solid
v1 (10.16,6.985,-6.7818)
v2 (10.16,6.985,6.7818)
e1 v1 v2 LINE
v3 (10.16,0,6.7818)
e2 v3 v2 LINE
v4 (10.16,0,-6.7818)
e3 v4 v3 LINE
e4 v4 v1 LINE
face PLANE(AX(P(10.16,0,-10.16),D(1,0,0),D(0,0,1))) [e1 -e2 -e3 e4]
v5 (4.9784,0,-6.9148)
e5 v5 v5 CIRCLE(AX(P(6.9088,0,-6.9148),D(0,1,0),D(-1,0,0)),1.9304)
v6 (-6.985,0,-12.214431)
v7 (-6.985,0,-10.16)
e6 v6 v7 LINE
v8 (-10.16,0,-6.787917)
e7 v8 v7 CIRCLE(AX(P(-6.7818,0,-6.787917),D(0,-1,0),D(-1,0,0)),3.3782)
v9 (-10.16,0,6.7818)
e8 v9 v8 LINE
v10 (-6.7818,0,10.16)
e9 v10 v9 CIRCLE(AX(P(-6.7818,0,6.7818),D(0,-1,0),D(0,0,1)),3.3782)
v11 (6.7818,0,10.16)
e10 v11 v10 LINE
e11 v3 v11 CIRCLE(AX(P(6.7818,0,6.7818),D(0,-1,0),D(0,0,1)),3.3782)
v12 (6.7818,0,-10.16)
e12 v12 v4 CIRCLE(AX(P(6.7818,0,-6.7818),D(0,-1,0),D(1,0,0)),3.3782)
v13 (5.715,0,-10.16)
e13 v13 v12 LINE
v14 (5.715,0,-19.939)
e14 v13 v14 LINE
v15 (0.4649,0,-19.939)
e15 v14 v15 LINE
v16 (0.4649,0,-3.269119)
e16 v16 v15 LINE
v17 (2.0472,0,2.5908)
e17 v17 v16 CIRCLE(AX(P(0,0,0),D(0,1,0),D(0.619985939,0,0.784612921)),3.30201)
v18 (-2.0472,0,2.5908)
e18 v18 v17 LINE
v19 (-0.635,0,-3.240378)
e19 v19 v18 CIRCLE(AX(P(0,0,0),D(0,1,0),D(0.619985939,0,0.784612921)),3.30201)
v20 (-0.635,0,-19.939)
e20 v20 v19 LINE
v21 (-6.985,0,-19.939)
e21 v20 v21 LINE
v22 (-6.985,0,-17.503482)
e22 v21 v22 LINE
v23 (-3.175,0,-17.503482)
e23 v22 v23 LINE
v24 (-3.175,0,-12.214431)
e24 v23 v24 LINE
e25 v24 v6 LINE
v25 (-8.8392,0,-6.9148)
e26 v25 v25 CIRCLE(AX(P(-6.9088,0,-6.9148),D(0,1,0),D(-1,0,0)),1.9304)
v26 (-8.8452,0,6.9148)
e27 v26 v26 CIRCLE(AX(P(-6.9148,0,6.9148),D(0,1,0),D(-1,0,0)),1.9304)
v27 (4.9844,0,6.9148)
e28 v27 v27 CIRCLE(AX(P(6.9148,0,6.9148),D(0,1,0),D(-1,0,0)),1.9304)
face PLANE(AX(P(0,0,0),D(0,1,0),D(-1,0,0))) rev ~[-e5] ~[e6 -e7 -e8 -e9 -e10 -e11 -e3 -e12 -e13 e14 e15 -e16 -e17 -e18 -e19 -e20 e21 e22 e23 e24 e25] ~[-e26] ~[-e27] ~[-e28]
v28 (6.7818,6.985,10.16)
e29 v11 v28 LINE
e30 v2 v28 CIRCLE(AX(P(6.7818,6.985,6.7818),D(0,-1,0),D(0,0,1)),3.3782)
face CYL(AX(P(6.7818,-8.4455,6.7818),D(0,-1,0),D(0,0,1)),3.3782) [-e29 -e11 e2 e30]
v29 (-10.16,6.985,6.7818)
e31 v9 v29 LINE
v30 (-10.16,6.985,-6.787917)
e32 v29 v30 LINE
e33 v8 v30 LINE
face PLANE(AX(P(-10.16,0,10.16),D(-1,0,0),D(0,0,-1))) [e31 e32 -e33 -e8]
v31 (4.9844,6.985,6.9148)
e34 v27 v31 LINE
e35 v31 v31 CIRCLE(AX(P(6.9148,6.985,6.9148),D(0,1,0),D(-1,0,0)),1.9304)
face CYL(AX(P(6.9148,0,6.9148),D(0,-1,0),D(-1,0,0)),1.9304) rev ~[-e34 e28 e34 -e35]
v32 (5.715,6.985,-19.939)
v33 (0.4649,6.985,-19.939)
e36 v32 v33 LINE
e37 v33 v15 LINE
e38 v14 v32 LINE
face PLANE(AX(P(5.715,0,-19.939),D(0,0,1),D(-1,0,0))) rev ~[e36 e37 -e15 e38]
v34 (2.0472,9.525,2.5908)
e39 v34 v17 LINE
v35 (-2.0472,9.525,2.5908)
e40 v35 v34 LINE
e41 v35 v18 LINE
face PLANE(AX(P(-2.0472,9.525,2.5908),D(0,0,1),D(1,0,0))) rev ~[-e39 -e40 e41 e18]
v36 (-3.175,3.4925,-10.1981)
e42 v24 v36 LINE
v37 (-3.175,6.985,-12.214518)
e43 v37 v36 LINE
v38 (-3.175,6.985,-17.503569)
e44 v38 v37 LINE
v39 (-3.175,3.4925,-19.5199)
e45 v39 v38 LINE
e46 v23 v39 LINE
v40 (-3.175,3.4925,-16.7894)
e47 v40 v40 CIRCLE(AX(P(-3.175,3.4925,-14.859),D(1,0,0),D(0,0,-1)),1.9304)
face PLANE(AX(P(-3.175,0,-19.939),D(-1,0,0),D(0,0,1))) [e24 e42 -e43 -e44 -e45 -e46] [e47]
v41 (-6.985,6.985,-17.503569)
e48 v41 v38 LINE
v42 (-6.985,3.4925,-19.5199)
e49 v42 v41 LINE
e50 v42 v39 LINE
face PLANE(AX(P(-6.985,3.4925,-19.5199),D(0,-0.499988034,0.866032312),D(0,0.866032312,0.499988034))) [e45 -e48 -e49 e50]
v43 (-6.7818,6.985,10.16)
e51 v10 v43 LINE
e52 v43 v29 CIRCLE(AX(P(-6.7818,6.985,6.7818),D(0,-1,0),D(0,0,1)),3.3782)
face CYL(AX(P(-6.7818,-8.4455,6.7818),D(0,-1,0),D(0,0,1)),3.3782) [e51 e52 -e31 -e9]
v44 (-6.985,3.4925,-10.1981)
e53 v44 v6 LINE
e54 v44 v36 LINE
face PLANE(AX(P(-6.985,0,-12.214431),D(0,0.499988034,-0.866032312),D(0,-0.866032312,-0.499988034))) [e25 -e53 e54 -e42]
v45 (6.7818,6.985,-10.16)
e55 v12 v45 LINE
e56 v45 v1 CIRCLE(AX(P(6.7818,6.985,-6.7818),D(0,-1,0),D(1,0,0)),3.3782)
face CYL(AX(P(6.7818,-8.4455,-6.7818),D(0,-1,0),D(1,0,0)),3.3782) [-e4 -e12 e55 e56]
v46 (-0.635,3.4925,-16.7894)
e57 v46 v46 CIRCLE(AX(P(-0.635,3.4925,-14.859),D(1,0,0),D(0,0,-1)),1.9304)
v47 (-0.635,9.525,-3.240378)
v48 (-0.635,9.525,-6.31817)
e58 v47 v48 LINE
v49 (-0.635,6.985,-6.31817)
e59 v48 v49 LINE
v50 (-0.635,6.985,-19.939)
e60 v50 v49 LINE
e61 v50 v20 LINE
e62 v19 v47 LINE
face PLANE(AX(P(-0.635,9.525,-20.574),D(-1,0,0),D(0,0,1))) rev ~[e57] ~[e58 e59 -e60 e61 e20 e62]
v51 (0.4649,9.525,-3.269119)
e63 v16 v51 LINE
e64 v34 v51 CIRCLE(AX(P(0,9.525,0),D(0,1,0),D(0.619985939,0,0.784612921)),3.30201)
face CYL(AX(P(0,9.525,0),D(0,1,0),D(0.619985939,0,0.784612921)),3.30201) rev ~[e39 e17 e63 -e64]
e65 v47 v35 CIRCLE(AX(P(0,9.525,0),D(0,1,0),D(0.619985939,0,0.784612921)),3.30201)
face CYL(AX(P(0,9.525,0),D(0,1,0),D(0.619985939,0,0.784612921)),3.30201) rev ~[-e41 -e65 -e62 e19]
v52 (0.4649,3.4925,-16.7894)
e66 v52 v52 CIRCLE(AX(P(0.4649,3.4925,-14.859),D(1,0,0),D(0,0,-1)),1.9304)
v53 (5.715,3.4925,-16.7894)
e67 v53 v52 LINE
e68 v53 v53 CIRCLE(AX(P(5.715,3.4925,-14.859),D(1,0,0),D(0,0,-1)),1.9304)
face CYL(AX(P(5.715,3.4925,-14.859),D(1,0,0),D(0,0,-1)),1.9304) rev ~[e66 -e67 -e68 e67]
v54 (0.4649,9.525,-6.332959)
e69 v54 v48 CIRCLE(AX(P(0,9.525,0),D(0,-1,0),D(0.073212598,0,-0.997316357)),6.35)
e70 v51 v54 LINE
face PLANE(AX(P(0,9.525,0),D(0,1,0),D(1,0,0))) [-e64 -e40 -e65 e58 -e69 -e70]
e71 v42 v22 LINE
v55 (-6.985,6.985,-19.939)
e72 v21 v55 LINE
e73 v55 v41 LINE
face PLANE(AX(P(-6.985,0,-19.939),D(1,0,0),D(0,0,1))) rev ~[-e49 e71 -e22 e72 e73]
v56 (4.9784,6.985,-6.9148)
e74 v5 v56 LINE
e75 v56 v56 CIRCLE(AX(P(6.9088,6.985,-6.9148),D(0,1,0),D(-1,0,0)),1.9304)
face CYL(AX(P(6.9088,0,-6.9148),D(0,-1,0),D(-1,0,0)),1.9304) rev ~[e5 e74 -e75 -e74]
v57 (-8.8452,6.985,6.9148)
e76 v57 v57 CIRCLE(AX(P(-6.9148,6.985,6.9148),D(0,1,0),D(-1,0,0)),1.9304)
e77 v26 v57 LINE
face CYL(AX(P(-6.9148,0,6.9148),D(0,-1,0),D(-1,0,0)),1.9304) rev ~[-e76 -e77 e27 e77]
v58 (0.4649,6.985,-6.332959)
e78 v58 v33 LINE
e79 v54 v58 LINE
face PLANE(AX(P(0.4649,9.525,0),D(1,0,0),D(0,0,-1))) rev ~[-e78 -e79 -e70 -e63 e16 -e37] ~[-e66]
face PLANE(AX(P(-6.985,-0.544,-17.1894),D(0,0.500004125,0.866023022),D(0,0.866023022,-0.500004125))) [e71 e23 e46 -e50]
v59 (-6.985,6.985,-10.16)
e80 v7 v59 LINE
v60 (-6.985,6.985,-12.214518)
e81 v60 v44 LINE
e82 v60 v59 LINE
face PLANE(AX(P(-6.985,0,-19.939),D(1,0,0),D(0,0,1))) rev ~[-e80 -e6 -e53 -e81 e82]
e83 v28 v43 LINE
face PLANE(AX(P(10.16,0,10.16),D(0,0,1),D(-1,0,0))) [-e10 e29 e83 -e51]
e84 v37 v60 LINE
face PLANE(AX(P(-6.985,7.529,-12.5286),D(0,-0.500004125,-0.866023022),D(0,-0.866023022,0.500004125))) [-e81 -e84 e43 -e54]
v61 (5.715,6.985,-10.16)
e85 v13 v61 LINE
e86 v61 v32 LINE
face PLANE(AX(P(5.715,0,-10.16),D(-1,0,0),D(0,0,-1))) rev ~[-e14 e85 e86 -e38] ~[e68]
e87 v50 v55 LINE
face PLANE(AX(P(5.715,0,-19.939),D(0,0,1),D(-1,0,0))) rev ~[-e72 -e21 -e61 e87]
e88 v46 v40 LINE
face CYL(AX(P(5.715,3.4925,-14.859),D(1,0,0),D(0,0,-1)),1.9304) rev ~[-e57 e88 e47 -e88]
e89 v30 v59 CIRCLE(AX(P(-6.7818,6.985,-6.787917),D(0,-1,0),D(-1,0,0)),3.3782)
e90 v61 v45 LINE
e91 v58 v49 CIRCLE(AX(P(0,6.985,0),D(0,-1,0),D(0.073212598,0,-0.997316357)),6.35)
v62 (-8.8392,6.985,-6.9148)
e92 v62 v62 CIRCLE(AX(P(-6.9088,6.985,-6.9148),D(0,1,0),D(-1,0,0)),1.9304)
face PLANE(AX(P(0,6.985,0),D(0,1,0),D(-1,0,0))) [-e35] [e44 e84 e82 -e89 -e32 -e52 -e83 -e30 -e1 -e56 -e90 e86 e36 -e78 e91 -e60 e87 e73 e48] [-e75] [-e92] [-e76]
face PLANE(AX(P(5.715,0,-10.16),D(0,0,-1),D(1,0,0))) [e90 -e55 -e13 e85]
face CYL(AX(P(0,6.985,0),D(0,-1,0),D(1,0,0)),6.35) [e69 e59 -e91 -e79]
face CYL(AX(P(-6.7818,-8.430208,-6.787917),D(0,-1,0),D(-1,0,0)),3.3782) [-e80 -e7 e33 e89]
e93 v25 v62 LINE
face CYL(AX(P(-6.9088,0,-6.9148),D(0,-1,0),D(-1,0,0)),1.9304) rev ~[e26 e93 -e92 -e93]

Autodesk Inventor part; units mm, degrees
ref_plane "YZ Plane" through (0, 0, 0) normal (1, 0, 0) x (0, 1, 0)
ref_plane "XZ Plane" through (0, 0, 0) normal (0, 1, 0) x (-1, 0, 0)
ref_plane "XY Plane" through (0, 0, 0) normal (0, 0, 1) x (1, 0, 0)
sketch "Sketch1" plane through (0, 0, 0) normal (0, 1, 0) x (-1, 0, 0)
  line L0 (-10.16, 10.16) -> (10.16, 10.16)
  line L1 (10.16, 10.16) -> (10.16, -10.16)
  line L2 (-10.16, -10.16) -> (-10.16, 10.16)
  circle A0 centre (6.9088, -6.9148) radius 1.9304
  circle A1 centre (6.9148, 6.9148) radius 1.9304
  circle A2 centre (-6.9148, 6.9148) radius 1.9304
  circle A3 centre (-6.9088, -6.9148) radius 1.9304
  line L3 (-5.715, -10.16) -> (-5.715, -19.939)
  line L4 (-5.715, -19.939) -> (6.985, -19.939)
  line L5 (6.985, -19.939) -> (6.985, -10.16)
  line L6 (10.16, -10.16) -> (6.985, -10.16)
  line L7 (-5.715, -10.16) -> (-10.16, -10.16)
  point P0 (0, 0)
  dimension "d0" = 20.32
  dimension "d2" = 10.16
  dimension "d3" = 10.16
  dimension "d4" = 3.8608
  dimension "d5" = 6.9148
  dimension "d6" = 6.9088
  dimension "d7" = 3.8608
  dimension "d8" = 6.9148
  dimension "d9" = 6.9148
  dimension "d10" = 3.8608
  dimension "d11" = 6.9148
  dimension "d12" = 6.9148
  dimension "d13" = 3.8608
  dimension "d14" = 12.7
  dimension "d16" = 6.985
  dimension "d43" = 10.16
  dimension "d44" = 10.16
  dimension "d45" = 6.9148
  dimension "d46" = 9.779
  dimension "d47" = 9.779
extrude "Extrusion1" add sketch "Sketch1" along normal blind 6.985
sketch "Sketch2" plane through (-6.985, 0, -19.939) normal (-1, 0, 0) x (0, 0, 1)
  circle A0 centre (5.08, 3.4925) radius 4.6609 construction
  line L0 (9.779, 0) -> (0, 0) projected
  line L1 (0, 0) -> (0, 6.985) projected
  line L2 (9.7409, 3.4925) -> (7.4105, -0.544)
  line L3 (7.4105, -0.544) -> (2.7496, -0.544)
  line L4 (2.7496, -0.544) -> (0.4191, 3.4925)
  line L5 (0.4191, 3.4925) -> (2.7495, 7.529)
  line L6 (2.7495, 7.529) -> (7.4104, 7.529)
  line L7 (7.4104, 7.529) -> (9.7409, 3.4925)
  point P0 (19.939, 0)
  dimension "d19" = 9.3218
  dimension "d20" = 3.4925
  dimension "d21" = 5.08
extrude "Extrusion2" cut sketch "Sketch2" against normal blind 3.81
sketch "Sketch3" plane through (5.715, 0, -10.16) normal (1, 0, 0) x (0, 0, -1)
  circle A0 centre (4.699, 3.4925) radius 1.9304
  line L0 (9.779, 0) -> (9.779, 6.985) projected
  line L1 (0, 6.985) -> (9.779, 6.985) projected
  point P0 (-10.16, 0)
  dimension "d24" = 3.8608
  dimension "d25" = 5.08
  dimension "d26" = 3.4925
extrude "Extrusion3" cut sketch "Sketch3" against normal through all
sketch "Sketch4" plane through (0, 6.985, 0) normal (0, 1, 0) x (1, 0, 0)
  circle A0 centre (0, 0) radius 6.35
  dimension "d29" = 12.7
extrude "Extrusion4" add sketch "Sketch4" along normal blind 2.54
sketch "Sketch5" plane through (0, 9.525, 0) normal (0, 1, 0) x (1, 0, 0)
  arc A0 (2.0472, -2.5908) -> (-2.0472, -2.5908) centre (0, 0) ccw
  line L0 (-2.0472, -2.5908) -> (2.0472, -2.5908)
  dimension "d32" = 6.604
  dimension "d33" = 2.5908
fillet "Fillet1" radius 3.3782 4 edges at (10.16, 3.4925, 10.16) (10.16, 3.4925, -10.16) (-10.16, 3.4925, 10.16) (-10.16, 3.4925, -10.16)
extrude "Extrusion5" cut sketch "Sketch5" against normal through all
sketch "Sketch6" plane through (0, 9.525, 0) normal (0, 1, 0) x (1, 0, 0)
  line L0 (-6.985, 19.939) -> (5.715, 19.939) projected
  line L1 (0.4649, 0) -> (0.4649, 19.939)
  line L2 (0.4649, 19.939) -> (-0.635, 20.574)
  line L3 (-0.635, 20.574) -> (-0.635, 0)
  line L4 (-0.4947, -21.2174) -> (0.4649, 19.939) construction
  line L5 (0.635, -20.574) -> (-0.635, 20.574) construction
  line L6 (-0.635, 0) -> (0.4649, 0)
  point P0 (0, 0)
  dimension "d37" = 1.27
extrude "Extrusion6" cut sketch "Sketch6" against normal through all
sketch "Sketch7" plane through (0, 0, 0) normal (0, -1, 0) x (1, 0, 0)
  circle A0 centre (-6.9148, 6.9148) radius 1.9304 construction
  circle A1 centre (-6.9148, 6.9148) radius 4.6609 construction
  point P0 (0, 0)
  dimension "d40" = 9.3218
equation "\"d2\" = 0.5 * d0"
equation "\"d3\" = 0.5 * d0"
equation "\"d8\" = d5"
equation "\"d9\" = d5"
equation "\"d11\" = d5"
equation "\"d12\" = d5"
equation "\"d43\" = 0.5 * d0"
equation "\"d44\" = 0.5 * d0"
equation "\"d45\" = d5"
properties part number "clamping hub 1_4 D through holes"
